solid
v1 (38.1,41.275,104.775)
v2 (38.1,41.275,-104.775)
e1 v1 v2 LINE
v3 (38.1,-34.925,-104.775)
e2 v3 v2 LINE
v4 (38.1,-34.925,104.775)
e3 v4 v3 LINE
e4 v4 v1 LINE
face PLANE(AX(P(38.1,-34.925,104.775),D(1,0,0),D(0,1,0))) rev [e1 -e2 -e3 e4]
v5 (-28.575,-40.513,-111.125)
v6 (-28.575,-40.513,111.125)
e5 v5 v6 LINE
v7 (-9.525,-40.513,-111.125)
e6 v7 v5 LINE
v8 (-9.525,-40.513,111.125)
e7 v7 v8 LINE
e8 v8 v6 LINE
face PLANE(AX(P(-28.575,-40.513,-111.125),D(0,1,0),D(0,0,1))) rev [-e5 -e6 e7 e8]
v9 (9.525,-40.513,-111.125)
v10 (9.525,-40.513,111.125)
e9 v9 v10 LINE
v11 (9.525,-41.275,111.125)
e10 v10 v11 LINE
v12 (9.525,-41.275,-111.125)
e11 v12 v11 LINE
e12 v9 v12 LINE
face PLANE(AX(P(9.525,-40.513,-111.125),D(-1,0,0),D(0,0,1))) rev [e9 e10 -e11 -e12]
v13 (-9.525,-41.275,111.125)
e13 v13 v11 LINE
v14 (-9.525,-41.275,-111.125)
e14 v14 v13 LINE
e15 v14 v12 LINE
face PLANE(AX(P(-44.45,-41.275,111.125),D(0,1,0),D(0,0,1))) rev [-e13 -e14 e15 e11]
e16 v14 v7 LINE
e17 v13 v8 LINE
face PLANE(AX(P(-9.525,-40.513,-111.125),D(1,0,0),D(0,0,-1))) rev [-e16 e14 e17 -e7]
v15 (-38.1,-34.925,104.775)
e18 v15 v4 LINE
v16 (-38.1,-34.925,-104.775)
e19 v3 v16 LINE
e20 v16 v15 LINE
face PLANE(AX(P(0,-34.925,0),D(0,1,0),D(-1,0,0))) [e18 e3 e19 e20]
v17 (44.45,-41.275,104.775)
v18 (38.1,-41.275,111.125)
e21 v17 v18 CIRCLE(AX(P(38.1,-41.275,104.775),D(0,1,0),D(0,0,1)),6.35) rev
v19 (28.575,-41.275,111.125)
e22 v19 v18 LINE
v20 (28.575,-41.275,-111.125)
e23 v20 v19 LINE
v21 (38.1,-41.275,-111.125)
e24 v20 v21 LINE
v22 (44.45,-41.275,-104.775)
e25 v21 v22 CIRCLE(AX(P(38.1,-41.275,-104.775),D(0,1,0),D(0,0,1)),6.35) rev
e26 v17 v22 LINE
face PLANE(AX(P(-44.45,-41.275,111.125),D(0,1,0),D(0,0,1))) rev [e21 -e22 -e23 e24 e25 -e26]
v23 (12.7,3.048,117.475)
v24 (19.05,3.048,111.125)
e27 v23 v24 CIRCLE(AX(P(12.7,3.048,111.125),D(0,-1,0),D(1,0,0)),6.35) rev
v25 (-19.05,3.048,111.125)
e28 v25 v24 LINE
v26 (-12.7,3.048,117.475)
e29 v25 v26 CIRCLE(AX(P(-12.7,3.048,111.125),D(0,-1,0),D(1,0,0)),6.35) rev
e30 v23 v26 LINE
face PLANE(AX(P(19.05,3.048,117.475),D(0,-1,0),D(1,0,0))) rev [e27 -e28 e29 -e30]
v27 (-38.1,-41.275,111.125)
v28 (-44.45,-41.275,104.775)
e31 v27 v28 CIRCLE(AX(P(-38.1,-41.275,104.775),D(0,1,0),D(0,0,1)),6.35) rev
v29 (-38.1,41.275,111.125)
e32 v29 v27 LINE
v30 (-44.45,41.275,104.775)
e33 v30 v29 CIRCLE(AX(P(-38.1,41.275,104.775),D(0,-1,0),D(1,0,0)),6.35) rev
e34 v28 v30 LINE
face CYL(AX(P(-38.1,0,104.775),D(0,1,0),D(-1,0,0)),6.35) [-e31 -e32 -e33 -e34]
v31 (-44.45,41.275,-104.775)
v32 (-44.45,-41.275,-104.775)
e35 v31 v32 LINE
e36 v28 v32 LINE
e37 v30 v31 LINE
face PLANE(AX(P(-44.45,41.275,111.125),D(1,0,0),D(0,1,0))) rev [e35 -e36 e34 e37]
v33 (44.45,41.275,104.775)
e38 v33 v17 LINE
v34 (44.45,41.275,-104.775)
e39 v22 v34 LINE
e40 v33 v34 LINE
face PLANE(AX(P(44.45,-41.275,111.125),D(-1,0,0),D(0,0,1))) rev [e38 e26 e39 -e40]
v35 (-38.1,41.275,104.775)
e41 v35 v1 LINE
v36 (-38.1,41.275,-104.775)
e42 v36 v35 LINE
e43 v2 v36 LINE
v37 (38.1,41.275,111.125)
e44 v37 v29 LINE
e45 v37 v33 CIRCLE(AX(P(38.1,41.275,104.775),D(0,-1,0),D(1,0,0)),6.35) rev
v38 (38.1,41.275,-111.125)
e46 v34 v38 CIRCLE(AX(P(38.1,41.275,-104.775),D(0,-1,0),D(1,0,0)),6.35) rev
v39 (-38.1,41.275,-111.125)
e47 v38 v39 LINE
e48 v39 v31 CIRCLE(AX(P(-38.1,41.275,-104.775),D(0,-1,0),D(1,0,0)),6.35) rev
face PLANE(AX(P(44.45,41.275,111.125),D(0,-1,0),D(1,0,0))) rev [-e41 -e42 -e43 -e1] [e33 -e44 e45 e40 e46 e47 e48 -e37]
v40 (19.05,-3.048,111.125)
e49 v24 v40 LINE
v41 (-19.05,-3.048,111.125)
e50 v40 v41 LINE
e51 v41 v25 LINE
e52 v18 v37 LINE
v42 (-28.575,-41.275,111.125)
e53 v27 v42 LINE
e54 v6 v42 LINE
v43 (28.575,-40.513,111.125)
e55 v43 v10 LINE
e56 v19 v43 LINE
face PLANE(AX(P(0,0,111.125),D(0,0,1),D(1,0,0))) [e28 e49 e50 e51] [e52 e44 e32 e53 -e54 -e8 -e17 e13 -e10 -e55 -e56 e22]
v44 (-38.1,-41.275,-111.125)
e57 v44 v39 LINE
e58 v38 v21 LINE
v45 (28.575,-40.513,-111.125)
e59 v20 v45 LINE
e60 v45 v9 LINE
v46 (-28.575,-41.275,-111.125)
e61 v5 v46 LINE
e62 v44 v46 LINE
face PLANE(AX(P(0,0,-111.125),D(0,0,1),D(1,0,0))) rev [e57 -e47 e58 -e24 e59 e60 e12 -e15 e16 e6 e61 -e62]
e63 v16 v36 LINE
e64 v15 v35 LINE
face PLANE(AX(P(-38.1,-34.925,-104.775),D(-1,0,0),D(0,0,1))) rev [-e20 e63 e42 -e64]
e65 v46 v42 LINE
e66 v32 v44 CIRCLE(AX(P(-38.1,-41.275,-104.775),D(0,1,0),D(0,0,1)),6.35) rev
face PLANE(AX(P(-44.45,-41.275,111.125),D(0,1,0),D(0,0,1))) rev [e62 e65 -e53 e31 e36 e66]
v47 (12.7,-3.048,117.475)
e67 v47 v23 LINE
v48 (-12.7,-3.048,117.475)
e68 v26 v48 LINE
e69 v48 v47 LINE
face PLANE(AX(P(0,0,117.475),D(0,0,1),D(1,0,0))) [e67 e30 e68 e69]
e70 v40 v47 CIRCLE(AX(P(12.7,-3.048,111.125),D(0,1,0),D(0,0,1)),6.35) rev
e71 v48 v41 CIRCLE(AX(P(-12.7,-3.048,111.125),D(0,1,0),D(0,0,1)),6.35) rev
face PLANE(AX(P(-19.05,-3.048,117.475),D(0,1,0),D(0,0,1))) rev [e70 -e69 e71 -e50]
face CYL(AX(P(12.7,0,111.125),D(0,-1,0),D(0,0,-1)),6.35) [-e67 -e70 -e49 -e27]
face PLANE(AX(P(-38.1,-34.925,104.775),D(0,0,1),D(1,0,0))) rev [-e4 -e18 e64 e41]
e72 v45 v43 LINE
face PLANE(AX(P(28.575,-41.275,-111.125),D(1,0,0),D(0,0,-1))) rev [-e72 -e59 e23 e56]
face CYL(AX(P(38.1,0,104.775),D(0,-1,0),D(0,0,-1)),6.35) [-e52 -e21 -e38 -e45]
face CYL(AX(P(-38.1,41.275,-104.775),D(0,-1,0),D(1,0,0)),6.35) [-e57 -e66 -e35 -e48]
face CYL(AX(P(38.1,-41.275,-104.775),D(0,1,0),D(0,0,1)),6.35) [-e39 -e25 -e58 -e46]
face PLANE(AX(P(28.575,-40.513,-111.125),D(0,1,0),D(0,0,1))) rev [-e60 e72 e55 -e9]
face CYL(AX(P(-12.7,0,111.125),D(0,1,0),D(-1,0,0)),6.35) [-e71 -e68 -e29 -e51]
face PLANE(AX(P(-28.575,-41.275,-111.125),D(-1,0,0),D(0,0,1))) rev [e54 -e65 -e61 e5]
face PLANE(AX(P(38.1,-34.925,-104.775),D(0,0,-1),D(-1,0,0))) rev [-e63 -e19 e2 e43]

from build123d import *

# Parameters (mm, degrees)
SKETCH1_W           = 88.9
SKETCH1_H           = 82.55
BOSS_EXTRUDE1_DEPTH = 111.125
SKETCH2_W           = 76.2
SKETCH2_H           = 209.55
CUT_EXTRUDE1_DEPTH  = 76.2
SKETCH3_W           = 38.1
SKETCH3_H           = 6.096
BOSS_EXTRUDE2_DEPTH = 6.35
SKETCH4_W           = 19.05
SKETCH4_H           = 0.762
CUT_EXTRUDE2_DEPTH  = 231.379015158
FILLET1_R           = 6.35
FILLET2_R           = 6.35


with BuildPart() as part:
    # Sketch1 → Boss-Extrude1 (new, symmetric)
    with BuildSketch(Plane.XY):
        Rectangle(SKETCH1_W, SKETCH1_H)
    extrude(amount=BOSS_EXTRUDE1_DEPTH, both=True)

    # Sketch2 → Cut-Extrude1 (cut)
    with BuildSketch(Plane(origin=(0, 41.275, 0), x_dir=(1, 0, 0), z_dir=(0, 1, 0))):
        Rectangle(SKETCH2_W, SKETCH2_H)
    extrude(amount=-CUT_EXTRUDE1_DEPTH, mode=Mode.SUBTRACT)

    # Sketch3 → Boss-Extrude2 (add, symmetric)
    with BuildSketch(Plane.XY.offset(111.125)):
        Rectangle(SKETCH3_W, SKETCH3_H)
    extrude(amount=BOSS_EXTRUDE2_DEPTH, both=True)

    # Sketch4 → Cut-Extrude2 (cut, through all)
    with BuildSketch(Plane.XY.offset(111.125)):
        with Locations((-19.05, -40.894)):
            Rectangle(SKETCH4_W, SKETCH4_H)
        with Locations((19.05, -40.894)):
            Rectangle(SKETCH4_W, SKETCH4_H)
    extrude(amount=-CUT_EXTRUDE2_DEPTH, mode=Mode.SUBTRACT)

    # Fillet1
    fillet1_edges = [part.edges().sort_by_distance(p)[0] for p in [
        (44.45, 0, 111.125),
        (44.45, 0, -111.125),
        (-44.45, 0, -111.125),
        (-44.45, 0, 111.125),
    ]]
    fillet(fillet1_edges, radius=FILLET1_R)

    # Fillet2
    fillet2_edges = [part.edges().sort_by_distance(p)[0] for p in [
        (19.05, 0, 117.475),
        (-19.05, 0, 117.475),
    ]]
    fillet(fillet2_edges, radius=FILLET2_R - 0.0001)  # a hair under: the kernel refuses the full size


solid = part.part
